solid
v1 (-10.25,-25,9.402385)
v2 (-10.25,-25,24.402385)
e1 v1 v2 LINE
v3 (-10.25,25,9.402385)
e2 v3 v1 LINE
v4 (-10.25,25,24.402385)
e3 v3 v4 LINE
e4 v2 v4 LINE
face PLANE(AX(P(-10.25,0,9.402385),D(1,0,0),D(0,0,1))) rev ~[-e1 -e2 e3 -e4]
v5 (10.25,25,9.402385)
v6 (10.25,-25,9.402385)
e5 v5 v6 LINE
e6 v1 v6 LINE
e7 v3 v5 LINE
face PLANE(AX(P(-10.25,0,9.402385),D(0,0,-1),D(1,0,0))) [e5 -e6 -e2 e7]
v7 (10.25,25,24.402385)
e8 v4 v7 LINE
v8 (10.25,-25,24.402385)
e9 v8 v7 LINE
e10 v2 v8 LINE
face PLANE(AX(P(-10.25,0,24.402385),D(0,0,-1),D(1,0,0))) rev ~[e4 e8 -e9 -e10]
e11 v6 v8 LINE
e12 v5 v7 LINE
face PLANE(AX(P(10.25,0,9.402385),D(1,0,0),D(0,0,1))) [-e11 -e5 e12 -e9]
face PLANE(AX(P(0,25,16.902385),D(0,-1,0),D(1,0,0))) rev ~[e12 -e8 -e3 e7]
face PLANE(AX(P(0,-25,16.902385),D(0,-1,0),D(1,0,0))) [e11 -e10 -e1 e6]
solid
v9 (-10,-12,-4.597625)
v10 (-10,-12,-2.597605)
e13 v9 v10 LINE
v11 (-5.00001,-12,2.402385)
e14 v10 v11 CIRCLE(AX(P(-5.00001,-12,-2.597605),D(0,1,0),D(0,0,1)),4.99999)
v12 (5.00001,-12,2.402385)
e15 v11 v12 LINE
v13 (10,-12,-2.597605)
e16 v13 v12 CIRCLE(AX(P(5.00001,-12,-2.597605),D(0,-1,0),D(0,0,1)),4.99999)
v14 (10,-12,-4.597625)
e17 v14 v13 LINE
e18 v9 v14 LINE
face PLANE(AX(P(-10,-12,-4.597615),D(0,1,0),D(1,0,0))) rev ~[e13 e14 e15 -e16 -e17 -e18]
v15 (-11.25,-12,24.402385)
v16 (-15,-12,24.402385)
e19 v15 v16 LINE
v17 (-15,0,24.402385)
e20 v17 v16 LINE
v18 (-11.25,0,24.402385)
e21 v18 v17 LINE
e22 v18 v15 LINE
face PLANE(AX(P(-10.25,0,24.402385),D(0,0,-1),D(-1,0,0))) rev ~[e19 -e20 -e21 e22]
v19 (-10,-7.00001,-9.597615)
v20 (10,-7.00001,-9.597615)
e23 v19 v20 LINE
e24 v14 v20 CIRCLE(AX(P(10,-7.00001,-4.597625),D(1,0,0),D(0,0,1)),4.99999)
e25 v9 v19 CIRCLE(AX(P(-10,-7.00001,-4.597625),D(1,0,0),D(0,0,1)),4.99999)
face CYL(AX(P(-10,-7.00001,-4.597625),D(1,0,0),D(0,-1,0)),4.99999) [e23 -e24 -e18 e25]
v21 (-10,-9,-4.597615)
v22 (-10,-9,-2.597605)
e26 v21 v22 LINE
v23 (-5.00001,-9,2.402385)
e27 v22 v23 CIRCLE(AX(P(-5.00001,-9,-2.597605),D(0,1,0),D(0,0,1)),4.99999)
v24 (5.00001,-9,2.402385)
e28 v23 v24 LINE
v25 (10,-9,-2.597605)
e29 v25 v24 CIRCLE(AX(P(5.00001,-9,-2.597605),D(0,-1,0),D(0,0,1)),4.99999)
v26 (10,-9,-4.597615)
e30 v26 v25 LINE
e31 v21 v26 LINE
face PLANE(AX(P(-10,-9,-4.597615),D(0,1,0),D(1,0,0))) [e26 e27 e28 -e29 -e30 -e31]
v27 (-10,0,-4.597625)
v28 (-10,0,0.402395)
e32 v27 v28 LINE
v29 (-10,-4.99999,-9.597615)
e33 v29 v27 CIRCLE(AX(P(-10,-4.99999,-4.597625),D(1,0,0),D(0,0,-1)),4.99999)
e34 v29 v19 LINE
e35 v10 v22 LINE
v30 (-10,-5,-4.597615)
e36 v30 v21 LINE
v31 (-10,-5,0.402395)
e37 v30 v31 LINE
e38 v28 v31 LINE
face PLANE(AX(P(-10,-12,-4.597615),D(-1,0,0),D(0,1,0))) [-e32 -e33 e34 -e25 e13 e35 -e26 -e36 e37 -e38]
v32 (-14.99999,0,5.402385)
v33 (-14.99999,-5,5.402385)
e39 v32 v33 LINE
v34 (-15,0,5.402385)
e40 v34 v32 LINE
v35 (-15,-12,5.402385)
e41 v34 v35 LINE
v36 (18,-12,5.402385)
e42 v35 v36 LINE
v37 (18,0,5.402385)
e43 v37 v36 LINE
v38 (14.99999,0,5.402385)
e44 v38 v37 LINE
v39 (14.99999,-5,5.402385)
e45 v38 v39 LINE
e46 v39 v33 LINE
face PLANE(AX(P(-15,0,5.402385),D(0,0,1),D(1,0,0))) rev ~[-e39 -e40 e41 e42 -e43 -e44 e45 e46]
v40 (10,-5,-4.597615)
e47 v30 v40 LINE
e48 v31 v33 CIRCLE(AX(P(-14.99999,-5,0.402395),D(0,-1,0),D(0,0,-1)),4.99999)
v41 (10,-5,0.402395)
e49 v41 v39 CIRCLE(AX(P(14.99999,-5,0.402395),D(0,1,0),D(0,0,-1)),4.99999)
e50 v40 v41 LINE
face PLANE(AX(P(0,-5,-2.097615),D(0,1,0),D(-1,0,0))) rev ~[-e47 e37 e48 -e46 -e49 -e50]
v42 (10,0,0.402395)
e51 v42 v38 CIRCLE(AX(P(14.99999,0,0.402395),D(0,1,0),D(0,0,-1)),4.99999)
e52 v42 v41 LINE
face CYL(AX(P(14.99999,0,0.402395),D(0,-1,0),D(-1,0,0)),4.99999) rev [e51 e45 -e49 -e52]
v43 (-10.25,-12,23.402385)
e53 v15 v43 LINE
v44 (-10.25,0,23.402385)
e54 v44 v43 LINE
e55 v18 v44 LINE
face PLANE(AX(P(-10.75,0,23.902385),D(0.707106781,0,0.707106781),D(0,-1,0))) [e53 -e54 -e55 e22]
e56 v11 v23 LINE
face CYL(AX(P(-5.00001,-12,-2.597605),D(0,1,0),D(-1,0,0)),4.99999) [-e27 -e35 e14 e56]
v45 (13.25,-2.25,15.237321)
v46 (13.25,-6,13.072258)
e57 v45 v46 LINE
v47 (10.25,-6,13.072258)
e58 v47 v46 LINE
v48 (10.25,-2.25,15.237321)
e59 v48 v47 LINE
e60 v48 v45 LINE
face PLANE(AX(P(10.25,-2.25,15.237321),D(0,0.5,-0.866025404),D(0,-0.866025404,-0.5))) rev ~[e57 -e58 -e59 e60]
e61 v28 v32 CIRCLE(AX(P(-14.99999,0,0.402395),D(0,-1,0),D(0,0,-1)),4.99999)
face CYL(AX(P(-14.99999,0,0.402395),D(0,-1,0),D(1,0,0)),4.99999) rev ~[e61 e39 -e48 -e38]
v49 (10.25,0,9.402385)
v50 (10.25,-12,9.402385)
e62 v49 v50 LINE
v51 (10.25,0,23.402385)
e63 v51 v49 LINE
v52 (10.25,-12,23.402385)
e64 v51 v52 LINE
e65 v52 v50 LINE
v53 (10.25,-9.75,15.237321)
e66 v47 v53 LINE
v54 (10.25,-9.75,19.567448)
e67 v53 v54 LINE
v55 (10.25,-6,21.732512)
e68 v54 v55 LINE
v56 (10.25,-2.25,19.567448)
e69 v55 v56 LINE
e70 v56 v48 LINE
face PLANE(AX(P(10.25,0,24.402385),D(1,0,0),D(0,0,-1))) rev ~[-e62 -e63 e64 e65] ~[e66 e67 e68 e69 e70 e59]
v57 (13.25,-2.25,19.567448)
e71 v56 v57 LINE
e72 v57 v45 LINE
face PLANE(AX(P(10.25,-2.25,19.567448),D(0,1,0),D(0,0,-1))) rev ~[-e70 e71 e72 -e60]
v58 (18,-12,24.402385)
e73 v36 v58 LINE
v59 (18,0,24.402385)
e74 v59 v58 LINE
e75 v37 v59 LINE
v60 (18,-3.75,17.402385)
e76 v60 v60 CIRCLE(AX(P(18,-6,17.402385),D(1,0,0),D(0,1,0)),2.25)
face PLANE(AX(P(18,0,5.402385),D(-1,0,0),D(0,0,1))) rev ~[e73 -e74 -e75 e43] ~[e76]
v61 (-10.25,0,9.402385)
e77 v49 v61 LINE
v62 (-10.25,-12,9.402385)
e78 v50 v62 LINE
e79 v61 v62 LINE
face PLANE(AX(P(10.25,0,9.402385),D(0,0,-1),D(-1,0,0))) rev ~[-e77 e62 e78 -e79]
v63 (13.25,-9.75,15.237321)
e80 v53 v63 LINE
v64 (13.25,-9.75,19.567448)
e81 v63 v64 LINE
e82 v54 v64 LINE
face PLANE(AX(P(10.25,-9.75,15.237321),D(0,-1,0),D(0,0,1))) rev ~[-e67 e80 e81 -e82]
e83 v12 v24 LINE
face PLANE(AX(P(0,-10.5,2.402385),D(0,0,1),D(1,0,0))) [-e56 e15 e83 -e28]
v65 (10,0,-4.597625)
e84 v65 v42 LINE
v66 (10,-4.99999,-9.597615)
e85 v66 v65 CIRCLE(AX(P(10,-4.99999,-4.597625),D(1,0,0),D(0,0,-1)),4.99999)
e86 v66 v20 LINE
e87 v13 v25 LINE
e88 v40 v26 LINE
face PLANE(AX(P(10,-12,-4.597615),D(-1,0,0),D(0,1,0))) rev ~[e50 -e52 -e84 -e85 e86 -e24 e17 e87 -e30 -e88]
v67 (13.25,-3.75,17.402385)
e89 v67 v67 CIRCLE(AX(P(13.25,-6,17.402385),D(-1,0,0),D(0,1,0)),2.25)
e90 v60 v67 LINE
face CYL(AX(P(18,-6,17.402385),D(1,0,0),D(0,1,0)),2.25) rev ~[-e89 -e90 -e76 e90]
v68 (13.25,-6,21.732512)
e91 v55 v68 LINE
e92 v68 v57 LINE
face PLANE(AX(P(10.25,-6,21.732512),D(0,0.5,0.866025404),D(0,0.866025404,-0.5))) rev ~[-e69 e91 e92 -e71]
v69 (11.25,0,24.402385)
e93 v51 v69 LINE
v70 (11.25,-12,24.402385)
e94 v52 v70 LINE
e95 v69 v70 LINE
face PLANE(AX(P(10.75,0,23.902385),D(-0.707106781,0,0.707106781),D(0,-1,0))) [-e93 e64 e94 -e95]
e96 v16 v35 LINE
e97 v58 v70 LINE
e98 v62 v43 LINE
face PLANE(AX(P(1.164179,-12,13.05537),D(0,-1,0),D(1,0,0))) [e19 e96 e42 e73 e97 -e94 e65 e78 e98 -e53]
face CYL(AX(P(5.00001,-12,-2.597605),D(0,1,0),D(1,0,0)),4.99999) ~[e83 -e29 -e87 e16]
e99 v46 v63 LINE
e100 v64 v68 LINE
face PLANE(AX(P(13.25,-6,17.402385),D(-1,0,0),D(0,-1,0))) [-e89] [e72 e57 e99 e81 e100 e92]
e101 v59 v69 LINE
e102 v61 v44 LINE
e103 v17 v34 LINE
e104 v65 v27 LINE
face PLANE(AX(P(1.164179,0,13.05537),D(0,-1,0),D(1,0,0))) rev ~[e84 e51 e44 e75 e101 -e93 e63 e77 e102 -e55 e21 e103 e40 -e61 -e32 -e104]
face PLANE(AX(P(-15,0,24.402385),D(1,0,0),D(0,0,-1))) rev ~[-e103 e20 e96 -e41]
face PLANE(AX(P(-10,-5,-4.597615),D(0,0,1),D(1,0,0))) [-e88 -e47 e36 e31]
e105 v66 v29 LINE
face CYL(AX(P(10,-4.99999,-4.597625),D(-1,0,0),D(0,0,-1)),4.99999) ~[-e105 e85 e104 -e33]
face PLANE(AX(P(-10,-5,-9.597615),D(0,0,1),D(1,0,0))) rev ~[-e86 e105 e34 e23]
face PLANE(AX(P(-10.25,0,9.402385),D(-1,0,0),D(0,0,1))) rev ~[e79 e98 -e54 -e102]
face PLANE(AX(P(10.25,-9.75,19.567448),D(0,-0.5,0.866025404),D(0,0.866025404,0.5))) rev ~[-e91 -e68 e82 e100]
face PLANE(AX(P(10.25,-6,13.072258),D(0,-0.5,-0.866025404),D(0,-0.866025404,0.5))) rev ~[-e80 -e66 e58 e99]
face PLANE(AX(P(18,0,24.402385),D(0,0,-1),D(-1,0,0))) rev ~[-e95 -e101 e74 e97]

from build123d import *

# Parameters (mm, degrees)
F0_W          = 20.5
F0_H          = 15
F1_DEPTH      = 25
F1_DEPTH_BACK = 25
F3_DEPTH      = 12
F4_R          = 2.25
F5_DEPTH      = 7.75
F6_R          = 2.25
F7_DEPTH      = 3
F8_SIZE       = 1
F9_W          = 20
F9_H          = 15
F10_DEPTH     = 5
F11_W         = 20
F11_H         = 5
F12_DEPTH     = 7
F13_W         = 20
F13_H         = 3
F14_DEPTH     = 7
F15_R         = 4.99999


# Not quite as in the source:
# - a fillet or chamfer is up to 0.001 mm smaller than in the source, because OpenCascade refuses the exact size


with BuildPart() as f1:
    # F0 (on Front) → F1 (new body, two sides)
    with BuildSketch(Plane.XZ) as f1_sk:
        with Locations((0, 16.9023849815)):
            Rectangle(F0_W, F0_H)
    extrude(amount=F1_DEPTH)
    extrude(f1_sk.sketch, amount=-F1_DEPTH_BACK)


with BuildPart() as f3:
    # F2 (on Front) → F3 (new body)
    with BuildSketch(Plane.XZ):
        Polygon((-10.25, 24.4023849815), (-15, 24.4023849815), (-15, 5.4023849815), (18, 5.4023849815), (18, 24.4023849815), (10.25, 24.4023849815), (10.25, 9.4023849815), (-10.25, 9.4023849815), align=None)
    extrude(amount=F3_DEPTH)

    # F4 (on face) → F5 (cut, through all)
    with BuildSketch(Plane.YZ.offset(18)):
        with Locations((-6, 17.4023849815)):
            Circle(F4_R)
    extrude(amount=-F5_DEPTH, mode=Mode.SUBTRACT)

    # F6 (on face) → F7 (cut)
    with BuildSketch(Plane(origin=(10.25, 0, 0), x_dir=(0, -1, 0), z_dir=(-1, 0, 0))):
        Polygon((9.75, 19.567448491), (6, 21.7325120004), (2.25, 19.567448491), (2.25, 15.2373214721), (6, 13.0722579626), (9.75, 15.2373214721), align=None)
        with Locations((6, 17.4023849815)):
            Circle(F6_R, mode=Mode.SUBTRACT)
    extrude(amount=-F7_DEPTH, mode=Mode.SUBTRACT)

    # F8
    f8_edges = [f3.edges().sort_by_distance(p)[0] for p in [
        (10.25, -6, 24.402385),
        (-10.25, -6, 24.402385),
    ]]
    chamfer(f8_edges, length=F8_SIZE)

    # F9 (on face) → F10 (join)
    with BuildSketch(Plane(origin=(0, 0, 0), x_dir=(-1, 0, 0), z_dir=(0, 1, 0))):
        with Locations((0, -2.0976150185)):
            Rectangle(F9_W, F9_H)
    extrude(amount=-F10_DEPTH)

    # F11 (on face) → F12 (join)
    with BuildSketch(Plane.XZ.offset(5)):
        with Locations((0, -7.0976150185)):
            Rectangle(F11_W, F11_H)
    extrude(amount=F12_DEPTH)

    # F13 (on face) → F14 (join)
    with BuildSketch(Plane.XY.offset(-4.5976150185)):
        with Locations((0, -10.5)):
            Rectangle(F13_W, F13_H)
    extrude(amount=F14_DEPTH)

    # F15 (radius 5 in the source; OpenCascade refuses exactly that, so slightly less here)
    f15_edges = [f3.edges().sort_by_distance(p)[0] for p in [
        (0, 0, -9.597615),
        (0, -12, -9.597615),
        (10, -10.5, 2.402385),
        (-10, -10.5, 2.402385),
        (10, -2.5, 5.402385),
        (-10, -2.5, 5.402385),
    ]]
    fillet(f15_edges, radius=F15_R)


solid = Compound([f1.part, f3.part])
